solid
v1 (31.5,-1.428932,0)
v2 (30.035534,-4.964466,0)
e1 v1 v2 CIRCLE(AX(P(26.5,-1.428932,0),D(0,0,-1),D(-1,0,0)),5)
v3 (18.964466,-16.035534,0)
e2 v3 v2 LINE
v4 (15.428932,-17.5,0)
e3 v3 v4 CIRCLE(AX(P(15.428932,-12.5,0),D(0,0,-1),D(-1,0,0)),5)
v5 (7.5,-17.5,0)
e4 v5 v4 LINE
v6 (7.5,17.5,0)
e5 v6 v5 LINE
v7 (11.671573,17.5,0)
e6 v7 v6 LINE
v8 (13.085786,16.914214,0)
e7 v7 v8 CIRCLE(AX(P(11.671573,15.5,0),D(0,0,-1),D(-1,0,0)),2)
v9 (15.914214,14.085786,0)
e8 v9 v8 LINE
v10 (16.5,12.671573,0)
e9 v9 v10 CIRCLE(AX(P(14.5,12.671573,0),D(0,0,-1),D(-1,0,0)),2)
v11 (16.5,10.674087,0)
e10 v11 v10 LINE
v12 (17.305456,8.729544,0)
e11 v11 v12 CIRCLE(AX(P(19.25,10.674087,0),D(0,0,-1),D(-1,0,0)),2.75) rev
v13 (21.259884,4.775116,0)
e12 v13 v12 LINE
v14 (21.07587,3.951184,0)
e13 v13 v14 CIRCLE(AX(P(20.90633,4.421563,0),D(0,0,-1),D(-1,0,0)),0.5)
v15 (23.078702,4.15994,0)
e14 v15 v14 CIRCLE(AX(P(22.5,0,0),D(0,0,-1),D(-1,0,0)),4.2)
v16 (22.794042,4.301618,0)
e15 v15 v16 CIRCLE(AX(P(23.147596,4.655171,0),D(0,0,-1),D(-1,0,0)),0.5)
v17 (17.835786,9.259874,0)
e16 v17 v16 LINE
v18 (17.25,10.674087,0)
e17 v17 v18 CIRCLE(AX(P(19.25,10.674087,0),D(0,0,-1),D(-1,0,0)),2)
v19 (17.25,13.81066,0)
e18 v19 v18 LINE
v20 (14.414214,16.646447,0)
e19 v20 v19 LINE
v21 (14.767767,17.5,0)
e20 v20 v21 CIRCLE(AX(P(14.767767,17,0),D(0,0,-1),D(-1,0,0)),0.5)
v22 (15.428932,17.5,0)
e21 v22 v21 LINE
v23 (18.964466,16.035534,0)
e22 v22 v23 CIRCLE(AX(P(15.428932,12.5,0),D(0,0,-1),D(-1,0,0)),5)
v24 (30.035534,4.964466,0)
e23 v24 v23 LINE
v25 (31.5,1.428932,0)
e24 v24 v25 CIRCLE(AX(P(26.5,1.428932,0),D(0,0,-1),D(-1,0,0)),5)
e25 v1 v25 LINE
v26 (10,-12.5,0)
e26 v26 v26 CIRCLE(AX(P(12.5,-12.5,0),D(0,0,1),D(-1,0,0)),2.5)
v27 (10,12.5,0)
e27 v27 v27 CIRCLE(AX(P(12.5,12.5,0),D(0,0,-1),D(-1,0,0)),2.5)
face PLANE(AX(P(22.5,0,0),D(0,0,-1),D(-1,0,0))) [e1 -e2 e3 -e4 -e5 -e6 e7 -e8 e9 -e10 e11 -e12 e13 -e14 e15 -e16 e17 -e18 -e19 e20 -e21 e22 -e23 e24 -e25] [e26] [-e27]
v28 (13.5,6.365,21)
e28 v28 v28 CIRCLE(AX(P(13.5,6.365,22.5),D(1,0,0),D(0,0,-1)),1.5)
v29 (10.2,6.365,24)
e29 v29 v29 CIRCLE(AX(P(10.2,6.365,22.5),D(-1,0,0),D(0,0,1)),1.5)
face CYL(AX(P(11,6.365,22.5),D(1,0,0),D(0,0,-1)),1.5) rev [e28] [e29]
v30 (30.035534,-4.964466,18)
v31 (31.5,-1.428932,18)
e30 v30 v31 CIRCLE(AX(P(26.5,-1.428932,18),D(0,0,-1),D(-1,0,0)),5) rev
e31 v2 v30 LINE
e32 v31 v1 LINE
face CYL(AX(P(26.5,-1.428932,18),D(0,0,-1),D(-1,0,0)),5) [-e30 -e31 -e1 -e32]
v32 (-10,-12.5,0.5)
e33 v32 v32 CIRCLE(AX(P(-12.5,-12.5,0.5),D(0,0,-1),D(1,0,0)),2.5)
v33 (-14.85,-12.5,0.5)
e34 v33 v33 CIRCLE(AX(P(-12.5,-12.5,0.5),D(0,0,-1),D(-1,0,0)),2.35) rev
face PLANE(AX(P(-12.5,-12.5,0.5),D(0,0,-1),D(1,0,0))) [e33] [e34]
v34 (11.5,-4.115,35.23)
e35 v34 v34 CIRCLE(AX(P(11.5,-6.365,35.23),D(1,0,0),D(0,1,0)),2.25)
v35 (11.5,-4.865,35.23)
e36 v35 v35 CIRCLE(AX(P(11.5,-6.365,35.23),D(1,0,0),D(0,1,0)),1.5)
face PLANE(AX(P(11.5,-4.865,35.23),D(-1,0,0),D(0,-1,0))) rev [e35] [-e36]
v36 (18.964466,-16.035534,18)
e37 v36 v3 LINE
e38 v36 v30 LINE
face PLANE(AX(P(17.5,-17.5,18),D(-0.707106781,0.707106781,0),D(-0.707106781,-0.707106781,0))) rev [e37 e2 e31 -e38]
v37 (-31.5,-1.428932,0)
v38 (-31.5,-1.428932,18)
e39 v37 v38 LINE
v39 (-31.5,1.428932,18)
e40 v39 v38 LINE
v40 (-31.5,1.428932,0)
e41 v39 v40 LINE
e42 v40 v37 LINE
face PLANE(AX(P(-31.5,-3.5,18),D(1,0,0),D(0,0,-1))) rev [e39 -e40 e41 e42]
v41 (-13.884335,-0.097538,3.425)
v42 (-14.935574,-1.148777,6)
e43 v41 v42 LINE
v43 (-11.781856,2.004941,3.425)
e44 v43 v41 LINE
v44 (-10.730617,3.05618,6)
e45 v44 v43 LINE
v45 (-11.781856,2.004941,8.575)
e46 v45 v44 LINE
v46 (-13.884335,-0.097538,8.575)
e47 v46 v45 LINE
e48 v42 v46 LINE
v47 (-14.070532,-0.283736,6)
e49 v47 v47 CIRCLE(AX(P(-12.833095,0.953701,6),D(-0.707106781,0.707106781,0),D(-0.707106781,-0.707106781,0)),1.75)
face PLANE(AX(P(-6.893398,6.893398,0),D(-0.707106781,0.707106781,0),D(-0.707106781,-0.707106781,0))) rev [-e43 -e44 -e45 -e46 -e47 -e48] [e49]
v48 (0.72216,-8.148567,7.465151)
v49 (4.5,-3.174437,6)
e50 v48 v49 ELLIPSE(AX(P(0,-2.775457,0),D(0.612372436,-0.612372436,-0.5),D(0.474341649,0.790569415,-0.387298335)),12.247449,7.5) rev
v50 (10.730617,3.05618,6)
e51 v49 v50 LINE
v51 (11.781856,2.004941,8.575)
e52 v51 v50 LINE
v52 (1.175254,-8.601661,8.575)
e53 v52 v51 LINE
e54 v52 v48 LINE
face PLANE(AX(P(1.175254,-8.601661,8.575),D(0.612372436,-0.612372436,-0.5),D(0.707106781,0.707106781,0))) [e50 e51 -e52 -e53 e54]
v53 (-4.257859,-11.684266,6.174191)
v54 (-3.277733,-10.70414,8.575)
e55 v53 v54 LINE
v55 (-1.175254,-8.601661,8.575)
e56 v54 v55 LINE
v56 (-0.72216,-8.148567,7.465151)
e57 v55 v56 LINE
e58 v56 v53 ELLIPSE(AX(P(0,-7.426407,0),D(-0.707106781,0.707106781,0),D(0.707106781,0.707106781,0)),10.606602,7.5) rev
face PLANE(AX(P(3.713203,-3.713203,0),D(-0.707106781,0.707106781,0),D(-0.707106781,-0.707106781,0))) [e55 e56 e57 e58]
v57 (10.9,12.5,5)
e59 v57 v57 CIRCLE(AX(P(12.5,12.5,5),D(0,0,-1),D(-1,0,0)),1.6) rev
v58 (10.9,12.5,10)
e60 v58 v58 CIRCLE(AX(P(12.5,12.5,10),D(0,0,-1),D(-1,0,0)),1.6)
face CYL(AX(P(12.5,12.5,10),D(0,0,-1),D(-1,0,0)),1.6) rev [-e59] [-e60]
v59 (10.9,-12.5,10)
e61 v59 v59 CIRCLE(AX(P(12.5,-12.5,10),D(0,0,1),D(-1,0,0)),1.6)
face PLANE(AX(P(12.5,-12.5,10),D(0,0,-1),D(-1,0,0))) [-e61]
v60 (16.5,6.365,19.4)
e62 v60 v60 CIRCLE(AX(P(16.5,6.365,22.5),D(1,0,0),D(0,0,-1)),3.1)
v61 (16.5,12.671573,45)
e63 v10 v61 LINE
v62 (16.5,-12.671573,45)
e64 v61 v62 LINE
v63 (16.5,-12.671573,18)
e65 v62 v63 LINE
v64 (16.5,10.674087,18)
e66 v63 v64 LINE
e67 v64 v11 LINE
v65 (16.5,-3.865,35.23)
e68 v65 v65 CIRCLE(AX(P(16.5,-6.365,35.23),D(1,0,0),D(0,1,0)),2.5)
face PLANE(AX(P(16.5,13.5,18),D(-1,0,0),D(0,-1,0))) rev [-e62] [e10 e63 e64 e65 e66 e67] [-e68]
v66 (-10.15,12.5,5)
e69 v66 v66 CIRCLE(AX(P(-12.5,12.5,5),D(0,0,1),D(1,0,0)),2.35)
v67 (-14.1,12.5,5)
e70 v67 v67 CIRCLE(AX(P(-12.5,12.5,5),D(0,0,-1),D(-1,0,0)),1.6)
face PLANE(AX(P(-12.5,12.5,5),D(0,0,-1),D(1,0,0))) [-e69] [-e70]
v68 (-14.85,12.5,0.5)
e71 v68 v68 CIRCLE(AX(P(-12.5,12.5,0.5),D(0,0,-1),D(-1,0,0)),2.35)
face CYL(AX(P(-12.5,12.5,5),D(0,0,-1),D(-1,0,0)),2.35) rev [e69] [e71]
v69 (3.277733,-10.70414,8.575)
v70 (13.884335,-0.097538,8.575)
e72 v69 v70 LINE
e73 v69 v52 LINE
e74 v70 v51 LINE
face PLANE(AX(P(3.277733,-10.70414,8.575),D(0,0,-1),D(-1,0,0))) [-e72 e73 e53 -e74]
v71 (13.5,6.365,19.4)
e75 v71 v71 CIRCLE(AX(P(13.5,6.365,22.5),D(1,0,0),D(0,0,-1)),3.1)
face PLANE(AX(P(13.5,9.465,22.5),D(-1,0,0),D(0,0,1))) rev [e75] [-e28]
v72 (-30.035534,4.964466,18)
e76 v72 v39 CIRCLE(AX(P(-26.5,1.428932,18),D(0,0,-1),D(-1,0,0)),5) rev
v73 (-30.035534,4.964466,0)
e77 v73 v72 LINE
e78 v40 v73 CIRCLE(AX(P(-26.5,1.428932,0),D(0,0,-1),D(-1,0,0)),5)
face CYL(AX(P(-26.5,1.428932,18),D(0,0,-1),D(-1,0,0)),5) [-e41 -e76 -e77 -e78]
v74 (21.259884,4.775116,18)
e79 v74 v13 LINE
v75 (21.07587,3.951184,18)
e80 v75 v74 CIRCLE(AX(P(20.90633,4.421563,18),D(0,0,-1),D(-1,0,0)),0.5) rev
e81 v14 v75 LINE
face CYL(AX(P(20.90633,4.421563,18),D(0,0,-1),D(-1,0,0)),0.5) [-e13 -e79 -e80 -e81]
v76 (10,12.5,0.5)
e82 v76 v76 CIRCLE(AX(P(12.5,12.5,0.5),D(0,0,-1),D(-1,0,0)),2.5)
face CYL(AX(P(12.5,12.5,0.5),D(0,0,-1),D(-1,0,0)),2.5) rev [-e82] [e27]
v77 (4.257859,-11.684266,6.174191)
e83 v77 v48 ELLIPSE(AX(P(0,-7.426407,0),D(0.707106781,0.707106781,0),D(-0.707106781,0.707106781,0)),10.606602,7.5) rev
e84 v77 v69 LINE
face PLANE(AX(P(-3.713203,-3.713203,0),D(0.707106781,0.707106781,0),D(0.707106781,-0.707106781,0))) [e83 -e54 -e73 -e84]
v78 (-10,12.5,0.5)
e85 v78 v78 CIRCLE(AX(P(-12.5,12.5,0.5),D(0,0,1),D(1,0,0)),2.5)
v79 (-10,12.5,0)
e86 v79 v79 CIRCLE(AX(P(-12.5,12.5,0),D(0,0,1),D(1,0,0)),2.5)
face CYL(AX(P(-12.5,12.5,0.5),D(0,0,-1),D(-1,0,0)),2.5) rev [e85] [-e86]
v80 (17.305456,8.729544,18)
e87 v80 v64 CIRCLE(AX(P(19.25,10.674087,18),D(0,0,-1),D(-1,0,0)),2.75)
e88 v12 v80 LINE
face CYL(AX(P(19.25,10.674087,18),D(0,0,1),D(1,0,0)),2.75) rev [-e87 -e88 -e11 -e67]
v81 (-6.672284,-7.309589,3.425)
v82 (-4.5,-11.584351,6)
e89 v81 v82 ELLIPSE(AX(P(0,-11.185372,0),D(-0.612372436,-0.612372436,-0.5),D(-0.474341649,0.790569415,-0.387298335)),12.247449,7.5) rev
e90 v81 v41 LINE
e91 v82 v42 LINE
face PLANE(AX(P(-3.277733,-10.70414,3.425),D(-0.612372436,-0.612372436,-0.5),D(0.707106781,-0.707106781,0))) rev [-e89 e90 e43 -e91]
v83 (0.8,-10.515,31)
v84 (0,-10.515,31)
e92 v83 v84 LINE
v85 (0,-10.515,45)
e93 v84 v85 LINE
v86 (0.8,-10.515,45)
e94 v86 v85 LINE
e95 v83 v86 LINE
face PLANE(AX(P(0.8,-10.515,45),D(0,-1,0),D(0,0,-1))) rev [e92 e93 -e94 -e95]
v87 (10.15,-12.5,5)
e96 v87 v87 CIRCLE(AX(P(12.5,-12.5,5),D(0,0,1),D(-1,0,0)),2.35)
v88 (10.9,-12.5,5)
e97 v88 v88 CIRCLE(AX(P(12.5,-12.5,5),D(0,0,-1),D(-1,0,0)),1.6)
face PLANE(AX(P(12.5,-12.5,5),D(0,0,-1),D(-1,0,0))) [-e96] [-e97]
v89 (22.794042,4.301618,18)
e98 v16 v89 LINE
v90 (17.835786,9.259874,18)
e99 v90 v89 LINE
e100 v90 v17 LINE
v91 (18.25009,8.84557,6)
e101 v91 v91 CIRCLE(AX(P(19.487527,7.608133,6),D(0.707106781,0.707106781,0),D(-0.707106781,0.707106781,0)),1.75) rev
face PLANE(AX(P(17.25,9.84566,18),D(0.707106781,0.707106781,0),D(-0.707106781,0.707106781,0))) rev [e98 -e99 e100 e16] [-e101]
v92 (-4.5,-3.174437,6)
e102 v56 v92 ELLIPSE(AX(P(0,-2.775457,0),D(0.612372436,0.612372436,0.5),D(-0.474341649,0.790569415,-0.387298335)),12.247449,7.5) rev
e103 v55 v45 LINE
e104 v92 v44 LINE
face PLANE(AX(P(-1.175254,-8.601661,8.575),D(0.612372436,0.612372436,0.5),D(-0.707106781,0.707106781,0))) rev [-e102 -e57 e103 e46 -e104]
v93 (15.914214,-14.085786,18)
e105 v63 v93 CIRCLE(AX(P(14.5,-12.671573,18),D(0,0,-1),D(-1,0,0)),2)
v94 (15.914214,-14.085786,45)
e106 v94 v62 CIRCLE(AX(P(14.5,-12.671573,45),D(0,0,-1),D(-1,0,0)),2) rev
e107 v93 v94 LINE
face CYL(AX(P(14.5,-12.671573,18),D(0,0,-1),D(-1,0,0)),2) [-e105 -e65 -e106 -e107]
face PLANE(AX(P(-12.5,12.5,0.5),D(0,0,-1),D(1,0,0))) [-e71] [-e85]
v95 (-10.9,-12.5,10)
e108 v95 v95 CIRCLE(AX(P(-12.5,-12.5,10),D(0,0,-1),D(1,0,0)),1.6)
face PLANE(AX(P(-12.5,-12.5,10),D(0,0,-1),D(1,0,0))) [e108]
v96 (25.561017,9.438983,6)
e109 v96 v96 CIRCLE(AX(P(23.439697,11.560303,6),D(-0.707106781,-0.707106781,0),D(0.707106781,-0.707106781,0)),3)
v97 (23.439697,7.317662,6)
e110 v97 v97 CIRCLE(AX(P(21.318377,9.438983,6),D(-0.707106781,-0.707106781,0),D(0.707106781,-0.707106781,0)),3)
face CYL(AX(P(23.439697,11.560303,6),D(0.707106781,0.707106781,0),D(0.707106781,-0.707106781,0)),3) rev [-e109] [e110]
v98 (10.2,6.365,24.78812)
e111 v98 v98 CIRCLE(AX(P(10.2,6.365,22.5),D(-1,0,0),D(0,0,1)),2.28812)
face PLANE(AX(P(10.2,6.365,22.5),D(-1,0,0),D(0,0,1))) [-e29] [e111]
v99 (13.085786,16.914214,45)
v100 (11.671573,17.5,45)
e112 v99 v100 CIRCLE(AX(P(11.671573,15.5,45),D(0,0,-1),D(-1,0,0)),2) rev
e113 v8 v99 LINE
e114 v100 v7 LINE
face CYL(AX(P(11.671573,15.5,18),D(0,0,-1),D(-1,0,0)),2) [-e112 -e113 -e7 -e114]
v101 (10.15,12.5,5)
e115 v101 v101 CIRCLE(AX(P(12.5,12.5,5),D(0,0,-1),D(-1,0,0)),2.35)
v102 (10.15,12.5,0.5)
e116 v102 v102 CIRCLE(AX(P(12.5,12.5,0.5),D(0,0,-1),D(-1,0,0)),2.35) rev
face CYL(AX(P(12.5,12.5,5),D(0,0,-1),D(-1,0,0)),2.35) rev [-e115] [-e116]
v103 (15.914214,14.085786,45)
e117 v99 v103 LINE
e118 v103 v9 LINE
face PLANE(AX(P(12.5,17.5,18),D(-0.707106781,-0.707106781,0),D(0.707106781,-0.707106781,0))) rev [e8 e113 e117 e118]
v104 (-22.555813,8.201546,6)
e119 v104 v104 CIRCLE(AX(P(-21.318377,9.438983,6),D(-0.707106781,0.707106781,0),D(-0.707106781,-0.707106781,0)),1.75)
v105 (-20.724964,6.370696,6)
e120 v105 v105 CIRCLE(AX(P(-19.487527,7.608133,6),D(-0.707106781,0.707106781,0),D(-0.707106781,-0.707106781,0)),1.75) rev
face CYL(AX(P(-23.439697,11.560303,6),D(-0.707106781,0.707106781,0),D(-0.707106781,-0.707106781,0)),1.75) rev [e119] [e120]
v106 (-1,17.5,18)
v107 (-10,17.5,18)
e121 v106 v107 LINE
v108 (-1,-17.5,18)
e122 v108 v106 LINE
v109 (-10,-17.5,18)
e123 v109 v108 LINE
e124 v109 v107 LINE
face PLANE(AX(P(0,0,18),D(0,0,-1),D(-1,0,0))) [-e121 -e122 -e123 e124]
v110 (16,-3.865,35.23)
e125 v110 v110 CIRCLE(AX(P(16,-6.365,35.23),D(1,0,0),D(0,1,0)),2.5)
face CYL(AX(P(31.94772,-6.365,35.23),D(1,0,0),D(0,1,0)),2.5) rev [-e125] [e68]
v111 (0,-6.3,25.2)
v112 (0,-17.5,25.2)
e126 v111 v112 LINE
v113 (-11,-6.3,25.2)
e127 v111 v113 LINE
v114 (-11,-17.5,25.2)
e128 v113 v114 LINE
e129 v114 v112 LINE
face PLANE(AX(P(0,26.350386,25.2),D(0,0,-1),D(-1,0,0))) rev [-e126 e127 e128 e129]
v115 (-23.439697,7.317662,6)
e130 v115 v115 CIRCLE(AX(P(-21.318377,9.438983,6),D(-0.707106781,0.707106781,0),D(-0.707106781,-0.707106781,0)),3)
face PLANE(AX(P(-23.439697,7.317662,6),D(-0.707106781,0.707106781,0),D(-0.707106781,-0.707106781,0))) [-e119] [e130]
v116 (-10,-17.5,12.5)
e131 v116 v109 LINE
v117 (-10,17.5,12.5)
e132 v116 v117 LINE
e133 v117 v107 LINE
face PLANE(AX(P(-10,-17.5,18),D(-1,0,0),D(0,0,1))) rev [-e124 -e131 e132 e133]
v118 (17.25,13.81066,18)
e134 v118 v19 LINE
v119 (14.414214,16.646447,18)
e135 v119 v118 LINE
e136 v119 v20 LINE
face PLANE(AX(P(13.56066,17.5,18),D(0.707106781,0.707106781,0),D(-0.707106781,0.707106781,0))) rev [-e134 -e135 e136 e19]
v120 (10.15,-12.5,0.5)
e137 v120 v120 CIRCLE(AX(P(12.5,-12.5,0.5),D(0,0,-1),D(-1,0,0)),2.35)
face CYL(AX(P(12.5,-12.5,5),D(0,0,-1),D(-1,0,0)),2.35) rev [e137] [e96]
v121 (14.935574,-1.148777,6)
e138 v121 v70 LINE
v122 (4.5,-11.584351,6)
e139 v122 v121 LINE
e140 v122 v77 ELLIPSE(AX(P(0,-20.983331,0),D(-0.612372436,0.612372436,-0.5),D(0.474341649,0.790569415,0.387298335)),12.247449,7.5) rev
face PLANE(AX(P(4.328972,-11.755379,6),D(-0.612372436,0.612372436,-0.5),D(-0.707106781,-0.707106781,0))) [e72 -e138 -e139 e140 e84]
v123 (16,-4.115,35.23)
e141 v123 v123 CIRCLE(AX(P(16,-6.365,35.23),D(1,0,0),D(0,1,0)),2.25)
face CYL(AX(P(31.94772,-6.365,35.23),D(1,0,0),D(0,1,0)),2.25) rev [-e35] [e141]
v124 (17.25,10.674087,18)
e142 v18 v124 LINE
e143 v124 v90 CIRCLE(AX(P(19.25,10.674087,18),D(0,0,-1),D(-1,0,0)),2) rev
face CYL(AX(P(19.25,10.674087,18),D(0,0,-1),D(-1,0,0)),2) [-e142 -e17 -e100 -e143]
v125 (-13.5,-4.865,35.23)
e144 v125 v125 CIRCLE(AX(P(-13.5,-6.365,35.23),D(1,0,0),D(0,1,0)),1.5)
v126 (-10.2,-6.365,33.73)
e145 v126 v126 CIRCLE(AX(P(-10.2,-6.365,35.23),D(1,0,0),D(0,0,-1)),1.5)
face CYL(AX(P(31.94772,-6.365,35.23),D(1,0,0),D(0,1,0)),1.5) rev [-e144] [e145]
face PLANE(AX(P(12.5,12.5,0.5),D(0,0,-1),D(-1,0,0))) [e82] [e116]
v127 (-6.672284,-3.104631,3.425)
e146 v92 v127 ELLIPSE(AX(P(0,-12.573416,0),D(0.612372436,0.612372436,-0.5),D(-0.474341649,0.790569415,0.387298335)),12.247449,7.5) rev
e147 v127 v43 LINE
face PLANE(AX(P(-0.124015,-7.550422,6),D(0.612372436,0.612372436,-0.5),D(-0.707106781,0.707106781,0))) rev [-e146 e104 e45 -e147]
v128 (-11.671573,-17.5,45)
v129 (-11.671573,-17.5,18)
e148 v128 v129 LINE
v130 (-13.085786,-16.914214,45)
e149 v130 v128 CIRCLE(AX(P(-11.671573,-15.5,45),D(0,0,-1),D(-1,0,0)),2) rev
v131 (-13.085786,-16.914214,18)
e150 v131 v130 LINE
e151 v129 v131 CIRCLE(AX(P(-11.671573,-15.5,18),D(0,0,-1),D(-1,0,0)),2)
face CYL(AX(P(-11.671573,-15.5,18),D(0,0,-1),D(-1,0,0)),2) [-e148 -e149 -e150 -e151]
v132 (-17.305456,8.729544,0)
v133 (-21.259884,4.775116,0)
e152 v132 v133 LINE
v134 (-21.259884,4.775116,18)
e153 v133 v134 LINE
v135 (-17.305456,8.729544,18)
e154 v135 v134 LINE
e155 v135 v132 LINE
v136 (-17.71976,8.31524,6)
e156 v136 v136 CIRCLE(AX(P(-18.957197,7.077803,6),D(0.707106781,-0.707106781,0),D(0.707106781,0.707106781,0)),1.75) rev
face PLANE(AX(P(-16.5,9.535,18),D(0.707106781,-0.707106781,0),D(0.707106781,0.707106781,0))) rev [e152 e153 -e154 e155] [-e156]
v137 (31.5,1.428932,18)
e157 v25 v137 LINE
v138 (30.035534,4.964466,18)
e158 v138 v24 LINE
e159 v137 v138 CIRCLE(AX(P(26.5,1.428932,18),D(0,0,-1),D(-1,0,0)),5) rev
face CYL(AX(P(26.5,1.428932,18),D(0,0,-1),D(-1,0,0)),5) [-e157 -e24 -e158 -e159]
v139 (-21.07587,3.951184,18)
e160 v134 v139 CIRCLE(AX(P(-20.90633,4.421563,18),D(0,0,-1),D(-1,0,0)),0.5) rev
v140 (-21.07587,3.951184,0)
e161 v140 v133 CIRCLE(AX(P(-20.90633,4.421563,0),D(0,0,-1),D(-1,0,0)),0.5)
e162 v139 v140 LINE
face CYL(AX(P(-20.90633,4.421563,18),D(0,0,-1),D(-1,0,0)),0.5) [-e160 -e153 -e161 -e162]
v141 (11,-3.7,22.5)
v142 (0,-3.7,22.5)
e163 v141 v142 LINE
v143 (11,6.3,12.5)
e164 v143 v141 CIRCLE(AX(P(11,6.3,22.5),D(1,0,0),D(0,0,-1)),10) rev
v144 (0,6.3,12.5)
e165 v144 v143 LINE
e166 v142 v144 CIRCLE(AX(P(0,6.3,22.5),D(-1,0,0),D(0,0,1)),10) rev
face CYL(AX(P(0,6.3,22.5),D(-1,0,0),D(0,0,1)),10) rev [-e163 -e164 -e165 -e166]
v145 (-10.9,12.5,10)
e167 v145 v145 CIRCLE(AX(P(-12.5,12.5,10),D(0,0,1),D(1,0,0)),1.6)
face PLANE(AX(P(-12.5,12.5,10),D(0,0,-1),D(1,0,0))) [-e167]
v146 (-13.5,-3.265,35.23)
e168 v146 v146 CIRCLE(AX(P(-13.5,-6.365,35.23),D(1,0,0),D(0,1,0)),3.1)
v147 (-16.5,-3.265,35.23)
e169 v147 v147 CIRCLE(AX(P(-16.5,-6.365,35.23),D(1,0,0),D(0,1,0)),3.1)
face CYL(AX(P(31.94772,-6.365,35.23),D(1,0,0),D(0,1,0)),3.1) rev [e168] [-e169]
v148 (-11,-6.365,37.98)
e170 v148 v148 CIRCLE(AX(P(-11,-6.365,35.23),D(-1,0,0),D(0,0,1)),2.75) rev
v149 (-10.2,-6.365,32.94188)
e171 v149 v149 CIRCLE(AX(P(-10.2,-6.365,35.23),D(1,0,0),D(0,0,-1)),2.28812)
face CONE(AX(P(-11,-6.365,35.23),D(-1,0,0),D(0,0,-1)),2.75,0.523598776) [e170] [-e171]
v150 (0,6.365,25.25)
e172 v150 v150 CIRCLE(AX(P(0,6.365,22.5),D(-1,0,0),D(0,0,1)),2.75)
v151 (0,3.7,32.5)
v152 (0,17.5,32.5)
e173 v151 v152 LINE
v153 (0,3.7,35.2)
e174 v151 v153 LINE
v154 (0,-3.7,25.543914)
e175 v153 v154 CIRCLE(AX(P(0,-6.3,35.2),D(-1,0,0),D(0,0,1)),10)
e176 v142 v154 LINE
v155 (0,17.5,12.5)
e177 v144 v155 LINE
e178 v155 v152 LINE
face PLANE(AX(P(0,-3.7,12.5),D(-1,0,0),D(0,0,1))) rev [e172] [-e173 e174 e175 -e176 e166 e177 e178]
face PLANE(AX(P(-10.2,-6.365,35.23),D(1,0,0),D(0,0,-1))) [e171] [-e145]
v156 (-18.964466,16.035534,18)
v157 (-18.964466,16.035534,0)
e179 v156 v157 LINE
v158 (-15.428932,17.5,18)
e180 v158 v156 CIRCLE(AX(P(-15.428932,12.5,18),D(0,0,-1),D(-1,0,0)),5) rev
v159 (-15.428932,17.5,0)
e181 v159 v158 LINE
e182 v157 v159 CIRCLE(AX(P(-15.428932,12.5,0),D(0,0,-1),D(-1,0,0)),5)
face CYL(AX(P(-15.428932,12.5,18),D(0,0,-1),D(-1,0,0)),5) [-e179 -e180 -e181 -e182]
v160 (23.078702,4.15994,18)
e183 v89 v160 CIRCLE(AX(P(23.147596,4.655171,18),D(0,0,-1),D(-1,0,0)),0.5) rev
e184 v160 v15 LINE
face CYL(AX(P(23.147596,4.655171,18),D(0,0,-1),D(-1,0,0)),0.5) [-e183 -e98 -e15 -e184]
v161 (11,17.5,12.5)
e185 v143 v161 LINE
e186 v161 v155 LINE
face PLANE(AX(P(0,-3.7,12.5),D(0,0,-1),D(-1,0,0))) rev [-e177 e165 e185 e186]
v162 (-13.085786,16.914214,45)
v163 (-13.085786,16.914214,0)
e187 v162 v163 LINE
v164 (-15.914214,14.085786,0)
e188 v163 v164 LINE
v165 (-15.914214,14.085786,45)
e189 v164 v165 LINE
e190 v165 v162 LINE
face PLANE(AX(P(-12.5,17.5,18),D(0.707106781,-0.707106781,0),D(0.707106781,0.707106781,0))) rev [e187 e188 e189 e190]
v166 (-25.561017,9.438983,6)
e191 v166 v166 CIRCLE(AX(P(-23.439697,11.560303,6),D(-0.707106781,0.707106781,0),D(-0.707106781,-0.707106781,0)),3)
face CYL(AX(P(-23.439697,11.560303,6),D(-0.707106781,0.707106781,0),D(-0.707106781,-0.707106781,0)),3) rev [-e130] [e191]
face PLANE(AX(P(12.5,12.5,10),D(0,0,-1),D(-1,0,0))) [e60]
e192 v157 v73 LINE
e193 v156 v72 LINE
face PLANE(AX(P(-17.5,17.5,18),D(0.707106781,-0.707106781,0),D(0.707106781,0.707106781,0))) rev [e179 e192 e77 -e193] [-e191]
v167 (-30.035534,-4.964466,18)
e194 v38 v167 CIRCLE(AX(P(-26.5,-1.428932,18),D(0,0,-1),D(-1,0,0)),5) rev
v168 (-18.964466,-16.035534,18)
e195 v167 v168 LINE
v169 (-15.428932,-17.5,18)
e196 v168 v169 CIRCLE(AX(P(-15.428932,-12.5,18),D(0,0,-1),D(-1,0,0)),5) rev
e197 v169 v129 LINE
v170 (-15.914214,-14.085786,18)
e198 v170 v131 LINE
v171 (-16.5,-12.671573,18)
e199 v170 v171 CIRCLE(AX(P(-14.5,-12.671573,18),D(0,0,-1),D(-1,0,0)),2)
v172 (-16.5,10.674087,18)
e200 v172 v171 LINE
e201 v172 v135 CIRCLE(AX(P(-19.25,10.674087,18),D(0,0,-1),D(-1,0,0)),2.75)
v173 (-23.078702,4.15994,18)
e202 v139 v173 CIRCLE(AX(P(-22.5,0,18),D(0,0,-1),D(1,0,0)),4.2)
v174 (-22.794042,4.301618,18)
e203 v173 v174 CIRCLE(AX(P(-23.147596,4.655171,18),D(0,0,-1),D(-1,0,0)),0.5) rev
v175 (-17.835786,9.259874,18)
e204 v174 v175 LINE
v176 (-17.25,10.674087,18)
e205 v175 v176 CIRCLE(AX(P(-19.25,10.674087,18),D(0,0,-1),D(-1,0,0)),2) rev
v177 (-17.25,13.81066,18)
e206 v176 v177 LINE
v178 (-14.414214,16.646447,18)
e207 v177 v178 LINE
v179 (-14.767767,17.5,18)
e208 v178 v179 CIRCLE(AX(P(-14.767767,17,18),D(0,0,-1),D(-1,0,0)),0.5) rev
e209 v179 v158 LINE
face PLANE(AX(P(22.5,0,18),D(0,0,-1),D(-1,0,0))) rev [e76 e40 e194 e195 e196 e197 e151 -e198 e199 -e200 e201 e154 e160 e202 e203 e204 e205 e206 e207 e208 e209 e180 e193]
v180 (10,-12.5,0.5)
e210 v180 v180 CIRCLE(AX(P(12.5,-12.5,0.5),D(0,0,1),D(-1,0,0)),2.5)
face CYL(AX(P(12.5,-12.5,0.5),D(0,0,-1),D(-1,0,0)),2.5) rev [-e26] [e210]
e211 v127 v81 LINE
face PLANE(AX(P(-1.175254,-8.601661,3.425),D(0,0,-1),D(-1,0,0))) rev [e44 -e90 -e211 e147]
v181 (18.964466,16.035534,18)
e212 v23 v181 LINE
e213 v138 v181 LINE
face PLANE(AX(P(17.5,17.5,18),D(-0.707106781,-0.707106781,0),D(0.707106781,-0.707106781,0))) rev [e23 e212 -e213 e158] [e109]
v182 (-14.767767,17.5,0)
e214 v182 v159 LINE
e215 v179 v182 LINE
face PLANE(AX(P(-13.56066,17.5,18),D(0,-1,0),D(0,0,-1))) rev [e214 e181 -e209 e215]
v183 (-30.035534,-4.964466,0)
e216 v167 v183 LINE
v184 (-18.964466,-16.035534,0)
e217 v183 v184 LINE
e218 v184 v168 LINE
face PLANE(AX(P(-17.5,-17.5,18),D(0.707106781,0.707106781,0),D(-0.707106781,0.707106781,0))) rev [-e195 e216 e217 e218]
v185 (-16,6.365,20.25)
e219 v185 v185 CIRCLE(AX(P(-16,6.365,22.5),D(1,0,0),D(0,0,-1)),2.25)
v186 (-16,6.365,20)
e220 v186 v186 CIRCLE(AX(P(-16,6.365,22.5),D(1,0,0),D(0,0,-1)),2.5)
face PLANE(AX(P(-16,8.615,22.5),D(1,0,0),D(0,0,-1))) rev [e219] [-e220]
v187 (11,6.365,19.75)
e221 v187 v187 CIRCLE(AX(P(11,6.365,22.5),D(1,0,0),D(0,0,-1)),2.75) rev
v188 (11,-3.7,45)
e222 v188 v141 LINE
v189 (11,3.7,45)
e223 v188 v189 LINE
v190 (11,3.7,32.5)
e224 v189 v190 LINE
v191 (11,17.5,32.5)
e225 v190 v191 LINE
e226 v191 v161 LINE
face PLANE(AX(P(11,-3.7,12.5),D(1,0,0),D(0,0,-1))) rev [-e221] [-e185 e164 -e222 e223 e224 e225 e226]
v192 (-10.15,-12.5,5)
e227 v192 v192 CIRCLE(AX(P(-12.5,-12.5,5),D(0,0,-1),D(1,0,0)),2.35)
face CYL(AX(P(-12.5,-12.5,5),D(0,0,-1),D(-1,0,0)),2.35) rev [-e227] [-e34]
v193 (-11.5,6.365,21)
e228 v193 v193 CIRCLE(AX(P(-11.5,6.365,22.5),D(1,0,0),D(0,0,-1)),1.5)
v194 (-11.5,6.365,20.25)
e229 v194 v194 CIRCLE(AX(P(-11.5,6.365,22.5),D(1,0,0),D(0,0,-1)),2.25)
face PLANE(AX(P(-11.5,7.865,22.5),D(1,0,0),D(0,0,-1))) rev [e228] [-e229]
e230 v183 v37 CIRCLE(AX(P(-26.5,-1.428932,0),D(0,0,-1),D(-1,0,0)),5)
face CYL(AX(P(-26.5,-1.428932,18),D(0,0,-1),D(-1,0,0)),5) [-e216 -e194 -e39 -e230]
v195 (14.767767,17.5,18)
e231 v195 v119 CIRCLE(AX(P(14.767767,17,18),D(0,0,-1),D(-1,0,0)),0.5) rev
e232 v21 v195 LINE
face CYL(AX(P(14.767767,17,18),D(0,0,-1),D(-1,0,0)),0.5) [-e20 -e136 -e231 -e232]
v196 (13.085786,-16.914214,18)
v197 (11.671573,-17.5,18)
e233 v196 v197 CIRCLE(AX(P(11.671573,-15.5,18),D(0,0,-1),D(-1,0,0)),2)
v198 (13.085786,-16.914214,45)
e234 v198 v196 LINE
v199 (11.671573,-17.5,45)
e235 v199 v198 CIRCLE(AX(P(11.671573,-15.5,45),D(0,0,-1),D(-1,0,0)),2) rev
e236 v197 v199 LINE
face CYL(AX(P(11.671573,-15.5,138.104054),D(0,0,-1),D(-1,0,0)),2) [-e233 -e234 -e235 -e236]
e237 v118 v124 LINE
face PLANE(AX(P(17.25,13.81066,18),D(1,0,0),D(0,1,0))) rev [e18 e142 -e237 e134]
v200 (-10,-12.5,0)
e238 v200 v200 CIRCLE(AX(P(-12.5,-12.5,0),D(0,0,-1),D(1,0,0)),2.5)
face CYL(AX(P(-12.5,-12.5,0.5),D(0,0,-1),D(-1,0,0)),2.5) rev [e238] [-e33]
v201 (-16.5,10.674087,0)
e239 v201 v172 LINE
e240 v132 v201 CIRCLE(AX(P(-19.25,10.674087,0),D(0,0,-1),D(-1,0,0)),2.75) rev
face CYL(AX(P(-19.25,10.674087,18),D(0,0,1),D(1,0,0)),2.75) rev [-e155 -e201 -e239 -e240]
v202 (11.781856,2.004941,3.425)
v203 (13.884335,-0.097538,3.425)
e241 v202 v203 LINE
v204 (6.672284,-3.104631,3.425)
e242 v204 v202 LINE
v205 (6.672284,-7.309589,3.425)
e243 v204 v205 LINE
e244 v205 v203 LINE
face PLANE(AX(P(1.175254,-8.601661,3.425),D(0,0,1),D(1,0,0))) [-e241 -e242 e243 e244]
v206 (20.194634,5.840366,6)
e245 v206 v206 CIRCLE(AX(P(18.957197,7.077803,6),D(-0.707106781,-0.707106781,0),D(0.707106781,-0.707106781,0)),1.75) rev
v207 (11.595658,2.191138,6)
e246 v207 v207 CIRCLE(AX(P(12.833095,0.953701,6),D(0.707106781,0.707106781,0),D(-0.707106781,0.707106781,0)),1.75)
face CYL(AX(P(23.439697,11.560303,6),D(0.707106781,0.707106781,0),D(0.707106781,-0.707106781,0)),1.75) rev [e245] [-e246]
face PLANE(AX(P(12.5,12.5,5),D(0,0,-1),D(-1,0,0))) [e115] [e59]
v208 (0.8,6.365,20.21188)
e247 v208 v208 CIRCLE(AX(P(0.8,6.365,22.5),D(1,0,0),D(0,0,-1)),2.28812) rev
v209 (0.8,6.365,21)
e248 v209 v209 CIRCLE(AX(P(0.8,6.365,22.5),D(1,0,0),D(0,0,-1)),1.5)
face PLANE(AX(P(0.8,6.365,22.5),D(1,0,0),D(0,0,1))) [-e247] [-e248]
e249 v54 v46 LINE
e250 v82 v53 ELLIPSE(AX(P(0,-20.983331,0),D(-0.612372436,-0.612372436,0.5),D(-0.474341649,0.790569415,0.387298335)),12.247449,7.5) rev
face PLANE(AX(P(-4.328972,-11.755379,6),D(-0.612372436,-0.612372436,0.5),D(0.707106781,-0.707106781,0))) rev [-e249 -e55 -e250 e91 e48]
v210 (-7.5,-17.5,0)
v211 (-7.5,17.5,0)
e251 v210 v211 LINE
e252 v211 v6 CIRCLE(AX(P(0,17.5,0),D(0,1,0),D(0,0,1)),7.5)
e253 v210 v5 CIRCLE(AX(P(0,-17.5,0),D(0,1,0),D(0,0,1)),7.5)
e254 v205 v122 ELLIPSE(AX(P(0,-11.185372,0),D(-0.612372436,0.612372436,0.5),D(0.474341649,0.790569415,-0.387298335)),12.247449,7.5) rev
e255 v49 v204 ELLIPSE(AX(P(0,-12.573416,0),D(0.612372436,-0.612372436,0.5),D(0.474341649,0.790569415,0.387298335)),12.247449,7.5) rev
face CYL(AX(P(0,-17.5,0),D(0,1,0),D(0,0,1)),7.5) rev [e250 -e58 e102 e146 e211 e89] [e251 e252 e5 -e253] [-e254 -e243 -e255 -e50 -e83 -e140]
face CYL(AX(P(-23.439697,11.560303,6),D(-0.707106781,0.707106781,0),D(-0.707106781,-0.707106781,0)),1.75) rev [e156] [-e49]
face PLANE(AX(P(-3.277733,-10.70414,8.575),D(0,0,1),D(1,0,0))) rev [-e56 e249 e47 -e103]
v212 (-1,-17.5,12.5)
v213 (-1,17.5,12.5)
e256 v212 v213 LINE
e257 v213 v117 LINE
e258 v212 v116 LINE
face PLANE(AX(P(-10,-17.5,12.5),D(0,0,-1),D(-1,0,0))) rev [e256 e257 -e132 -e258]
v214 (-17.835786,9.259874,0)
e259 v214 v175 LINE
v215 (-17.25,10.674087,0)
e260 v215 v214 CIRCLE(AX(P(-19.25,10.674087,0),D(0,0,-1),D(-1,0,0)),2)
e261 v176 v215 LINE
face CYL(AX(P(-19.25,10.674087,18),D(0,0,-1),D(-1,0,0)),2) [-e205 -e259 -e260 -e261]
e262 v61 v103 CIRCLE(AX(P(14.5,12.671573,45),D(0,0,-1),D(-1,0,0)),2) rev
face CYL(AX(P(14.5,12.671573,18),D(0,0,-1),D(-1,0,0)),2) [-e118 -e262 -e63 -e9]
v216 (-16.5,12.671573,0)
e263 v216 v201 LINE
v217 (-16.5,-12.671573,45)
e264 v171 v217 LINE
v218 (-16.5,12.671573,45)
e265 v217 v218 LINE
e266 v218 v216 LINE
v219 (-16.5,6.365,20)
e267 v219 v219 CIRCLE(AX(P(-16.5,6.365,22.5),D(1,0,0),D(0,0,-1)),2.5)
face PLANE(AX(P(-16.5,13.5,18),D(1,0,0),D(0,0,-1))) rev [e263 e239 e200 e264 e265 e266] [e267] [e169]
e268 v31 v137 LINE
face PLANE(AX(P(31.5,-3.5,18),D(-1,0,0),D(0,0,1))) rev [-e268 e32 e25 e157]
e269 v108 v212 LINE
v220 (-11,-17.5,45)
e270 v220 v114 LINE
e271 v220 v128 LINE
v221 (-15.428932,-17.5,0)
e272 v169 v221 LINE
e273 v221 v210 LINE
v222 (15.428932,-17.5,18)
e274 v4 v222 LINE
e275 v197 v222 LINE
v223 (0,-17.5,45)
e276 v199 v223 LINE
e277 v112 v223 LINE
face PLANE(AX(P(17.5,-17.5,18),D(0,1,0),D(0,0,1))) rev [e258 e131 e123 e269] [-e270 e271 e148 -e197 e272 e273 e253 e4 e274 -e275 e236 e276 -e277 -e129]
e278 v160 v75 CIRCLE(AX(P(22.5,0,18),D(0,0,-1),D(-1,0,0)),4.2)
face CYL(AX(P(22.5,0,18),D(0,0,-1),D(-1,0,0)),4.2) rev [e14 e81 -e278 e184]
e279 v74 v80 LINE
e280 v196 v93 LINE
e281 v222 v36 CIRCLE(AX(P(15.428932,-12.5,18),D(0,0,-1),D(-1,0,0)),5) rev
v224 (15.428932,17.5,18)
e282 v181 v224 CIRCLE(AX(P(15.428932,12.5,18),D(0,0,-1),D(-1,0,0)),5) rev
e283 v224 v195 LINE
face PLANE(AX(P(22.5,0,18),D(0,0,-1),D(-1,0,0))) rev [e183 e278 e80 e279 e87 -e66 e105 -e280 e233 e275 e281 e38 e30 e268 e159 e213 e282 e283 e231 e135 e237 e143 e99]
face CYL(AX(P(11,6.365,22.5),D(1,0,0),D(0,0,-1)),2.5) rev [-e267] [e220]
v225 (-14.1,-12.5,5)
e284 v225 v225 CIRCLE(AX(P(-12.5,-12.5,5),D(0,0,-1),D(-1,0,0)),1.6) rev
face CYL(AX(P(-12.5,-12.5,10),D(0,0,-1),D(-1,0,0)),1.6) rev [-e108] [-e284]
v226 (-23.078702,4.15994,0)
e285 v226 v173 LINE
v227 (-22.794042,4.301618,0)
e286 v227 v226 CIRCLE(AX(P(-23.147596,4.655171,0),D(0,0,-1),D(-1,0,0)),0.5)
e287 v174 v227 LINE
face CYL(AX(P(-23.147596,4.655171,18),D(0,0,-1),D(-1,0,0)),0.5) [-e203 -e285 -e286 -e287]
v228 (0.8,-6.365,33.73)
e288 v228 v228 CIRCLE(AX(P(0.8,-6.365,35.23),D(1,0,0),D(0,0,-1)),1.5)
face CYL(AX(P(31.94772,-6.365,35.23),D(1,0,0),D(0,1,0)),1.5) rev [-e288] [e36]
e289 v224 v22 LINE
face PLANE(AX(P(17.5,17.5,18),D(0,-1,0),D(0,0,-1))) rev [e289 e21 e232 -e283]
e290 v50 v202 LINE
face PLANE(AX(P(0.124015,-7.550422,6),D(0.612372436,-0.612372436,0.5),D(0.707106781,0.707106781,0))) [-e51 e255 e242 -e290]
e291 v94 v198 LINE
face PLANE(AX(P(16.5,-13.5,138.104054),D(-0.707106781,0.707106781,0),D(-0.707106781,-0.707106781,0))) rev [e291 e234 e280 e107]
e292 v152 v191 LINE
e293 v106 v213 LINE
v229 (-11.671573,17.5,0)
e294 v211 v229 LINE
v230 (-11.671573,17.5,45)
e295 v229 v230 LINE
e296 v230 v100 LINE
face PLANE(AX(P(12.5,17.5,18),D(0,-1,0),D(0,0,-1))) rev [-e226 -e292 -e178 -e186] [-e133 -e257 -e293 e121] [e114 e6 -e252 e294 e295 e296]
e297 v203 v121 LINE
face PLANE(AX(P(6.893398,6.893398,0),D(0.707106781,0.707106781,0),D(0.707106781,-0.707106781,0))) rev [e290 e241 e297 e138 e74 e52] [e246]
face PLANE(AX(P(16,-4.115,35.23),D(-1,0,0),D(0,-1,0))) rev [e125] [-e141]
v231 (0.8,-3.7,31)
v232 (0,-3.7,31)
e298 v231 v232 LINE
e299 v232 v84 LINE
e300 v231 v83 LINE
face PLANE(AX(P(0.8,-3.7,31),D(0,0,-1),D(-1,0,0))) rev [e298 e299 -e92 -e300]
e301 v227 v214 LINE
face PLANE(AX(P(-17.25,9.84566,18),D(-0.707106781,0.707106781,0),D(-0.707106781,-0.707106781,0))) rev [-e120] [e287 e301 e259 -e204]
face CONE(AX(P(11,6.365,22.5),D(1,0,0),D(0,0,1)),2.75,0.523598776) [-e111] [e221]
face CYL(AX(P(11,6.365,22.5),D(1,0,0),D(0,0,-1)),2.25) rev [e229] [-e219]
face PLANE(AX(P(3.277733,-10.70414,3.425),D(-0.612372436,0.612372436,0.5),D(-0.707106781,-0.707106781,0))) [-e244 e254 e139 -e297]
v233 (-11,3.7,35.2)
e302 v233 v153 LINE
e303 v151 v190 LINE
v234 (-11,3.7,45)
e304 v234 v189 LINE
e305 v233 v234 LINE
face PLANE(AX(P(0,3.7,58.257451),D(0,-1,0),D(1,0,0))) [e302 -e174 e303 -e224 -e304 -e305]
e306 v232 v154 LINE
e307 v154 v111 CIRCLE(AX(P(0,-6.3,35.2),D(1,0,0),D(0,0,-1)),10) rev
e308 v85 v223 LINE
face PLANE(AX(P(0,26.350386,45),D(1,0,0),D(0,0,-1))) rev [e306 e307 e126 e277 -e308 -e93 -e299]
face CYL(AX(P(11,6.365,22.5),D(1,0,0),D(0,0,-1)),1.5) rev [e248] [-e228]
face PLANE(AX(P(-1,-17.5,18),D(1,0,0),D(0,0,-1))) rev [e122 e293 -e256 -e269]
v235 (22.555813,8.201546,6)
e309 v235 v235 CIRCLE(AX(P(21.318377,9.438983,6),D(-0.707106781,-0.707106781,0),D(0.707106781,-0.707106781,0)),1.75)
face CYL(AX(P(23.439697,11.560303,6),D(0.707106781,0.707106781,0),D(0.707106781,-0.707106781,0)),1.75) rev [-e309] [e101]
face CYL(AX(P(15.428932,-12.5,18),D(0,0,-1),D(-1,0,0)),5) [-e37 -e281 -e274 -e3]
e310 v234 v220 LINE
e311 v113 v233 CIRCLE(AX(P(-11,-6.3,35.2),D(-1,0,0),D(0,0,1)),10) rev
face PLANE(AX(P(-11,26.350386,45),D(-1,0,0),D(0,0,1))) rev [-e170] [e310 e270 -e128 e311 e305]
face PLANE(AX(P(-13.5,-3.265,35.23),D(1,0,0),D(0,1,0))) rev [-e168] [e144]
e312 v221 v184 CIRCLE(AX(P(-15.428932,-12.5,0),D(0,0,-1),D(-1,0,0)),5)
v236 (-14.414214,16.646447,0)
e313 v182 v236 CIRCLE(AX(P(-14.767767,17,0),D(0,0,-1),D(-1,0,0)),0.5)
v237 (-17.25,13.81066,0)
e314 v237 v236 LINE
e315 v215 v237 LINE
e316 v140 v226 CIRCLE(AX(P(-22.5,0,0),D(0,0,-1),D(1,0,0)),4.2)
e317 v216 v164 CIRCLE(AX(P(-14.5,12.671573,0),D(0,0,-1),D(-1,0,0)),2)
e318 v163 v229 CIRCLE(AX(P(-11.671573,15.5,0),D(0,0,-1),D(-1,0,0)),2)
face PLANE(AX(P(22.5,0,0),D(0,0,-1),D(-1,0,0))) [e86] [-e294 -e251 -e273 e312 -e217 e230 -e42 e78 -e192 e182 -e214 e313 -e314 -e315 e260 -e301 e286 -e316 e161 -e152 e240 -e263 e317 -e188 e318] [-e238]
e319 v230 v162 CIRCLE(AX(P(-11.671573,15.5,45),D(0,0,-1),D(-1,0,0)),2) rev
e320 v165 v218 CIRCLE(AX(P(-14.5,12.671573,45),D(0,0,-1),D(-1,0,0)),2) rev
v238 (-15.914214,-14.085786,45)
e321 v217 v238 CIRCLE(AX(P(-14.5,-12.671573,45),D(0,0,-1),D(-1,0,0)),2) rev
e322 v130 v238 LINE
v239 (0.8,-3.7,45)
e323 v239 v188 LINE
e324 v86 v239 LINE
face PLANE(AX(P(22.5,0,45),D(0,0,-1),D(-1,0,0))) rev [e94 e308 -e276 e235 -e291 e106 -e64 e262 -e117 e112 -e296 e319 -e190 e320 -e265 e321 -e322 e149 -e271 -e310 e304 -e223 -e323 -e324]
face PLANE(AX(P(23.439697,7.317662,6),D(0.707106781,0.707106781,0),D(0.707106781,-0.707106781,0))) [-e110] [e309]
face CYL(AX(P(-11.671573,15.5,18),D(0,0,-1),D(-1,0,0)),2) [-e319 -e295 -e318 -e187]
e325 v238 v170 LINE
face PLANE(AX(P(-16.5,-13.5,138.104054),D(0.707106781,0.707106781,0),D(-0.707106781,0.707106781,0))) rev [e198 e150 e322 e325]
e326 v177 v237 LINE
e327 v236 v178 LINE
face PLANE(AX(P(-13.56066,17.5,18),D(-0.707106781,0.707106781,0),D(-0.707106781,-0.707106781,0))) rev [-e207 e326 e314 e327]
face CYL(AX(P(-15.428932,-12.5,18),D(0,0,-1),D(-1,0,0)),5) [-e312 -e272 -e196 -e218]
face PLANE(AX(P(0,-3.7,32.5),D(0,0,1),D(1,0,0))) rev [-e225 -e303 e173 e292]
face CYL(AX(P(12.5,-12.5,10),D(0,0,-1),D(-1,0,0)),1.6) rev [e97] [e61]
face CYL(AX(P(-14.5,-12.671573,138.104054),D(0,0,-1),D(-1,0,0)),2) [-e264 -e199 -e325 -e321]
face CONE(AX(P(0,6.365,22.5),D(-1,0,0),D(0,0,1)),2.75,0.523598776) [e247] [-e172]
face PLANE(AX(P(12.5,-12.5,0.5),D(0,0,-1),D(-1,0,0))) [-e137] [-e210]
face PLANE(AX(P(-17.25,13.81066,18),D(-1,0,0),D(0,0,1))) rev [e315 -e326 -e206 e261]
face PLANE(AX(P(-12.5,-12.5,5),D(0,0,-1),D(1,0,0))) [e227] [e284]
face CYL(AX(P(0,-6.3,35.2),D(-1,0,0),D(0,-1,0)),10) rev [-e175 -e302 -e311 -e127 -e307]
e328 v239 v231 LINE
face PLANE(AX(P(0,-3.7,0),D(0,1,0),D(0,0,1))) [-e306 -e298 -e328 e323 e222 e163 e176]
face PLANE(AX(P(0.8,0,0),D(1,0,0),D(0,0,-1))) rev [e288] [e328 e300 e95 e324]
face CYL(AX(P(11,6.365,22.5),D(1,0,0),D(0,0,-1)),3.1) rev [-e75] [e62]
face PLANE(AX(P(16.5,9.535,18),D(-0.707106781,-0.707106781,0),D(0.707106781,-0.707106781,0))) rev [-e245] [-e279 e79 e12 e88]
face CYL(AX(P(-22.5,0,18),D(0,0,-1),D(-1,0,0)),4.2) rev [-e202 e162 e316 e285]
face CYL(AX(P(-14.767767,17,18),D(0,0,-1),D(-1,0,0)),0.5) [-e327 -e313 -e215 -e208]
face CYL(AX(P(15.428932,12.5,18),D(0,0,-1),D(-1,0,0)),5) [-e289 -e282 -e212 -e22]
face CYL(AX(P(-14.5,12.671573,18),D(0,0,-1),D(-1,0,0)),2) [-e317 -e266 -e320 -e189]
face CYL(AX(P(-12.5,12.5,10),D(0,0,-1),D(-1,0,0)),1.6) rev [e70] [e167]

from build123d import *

# Parameters (mm, degrees)
BOSS_EXTRUDE1_DEPTH     = 18
SKETCH2_R               = 7.5
SKETCH2_W               = 9
SKETCH2_H               = 5.5
CUT_EXTRUDE1_DEPTH      = 51.410812332
FILLET1_R               = 5
FILLET2_R               = 0.5
FILLET3_R               = 2
FILLET4_R               = 2.75
CUT_EXTRUDE2_DEPTH      = 15
SKETCH7_R               = 1.6
CUT_EXTRUDE3_DEPTH      = 10
SKETCH8_R               = 2.35
CUT_EXTRUDE4_DEPTH      = 5
SKETCH9_R               = 2.5
CUT_EXTRUDE5_DEPTH      = 0.5
MIRROR3_COPY_1_SKETCH_R = 1.6
MIRROR3_COPY_1_DEPTH    = 10
MIRROR3_COPY_2_SKETCH_R = 2.35
MIRROR3_COPY_2_DEPTH    = 5
MIRROR3_COPY_3_SKETCH_R = 2.5
MIRROR3_COPY_3_DEPTH    = 0.5
BOSS_EXTRUDE2_DEPTH     = 27
SKETCH11_W              = 11
SKETCH11_H              = 20
CUT_EXTRUDE6_DEPTH      = 21.2
SKETCH12_W              = 11
SKETCH12_H              = 3.7
CUT_EXTRUDE7_DEPTH      = 12.5
FILLET5_R               = 10
CUT_EXTRUDE8_REACH      = 67.133
SKETCH13_W              = 11
SKETCH13_H              = 19.8
FILLET6_R               = 10
SKETCH14_W              = 11
SKETCH14_H              = 7.4
CUT_EXTRUDE9_DEPTH      = 12.5
SKETCH15_R              = 2.75
BOSS_EXTRUDE3_DEPTH     = 0.8
BOSS_EXTRUDE3_TAPER     = 30
SKETCH16_W              = 14
SKETCH16_H              = 6.815
CUT_EXTRUDE10_DEPTH     = 0.8
SKETCH19_R              = 2.75
BOSS_EXTRUDE4_DEPTH     = 0.8
BOSS_EXTRUDE4_TAPER     = 30
FILLET7_R               = 2


with BuildPart() as part:
    # Sketch1 → Boss-Extrude1 (new body)
    with BuildSketch(Plane.XY):
        with BuildLine():
            Line((-17.5, 17.5), (-31.5, 3.5))
            Line((-31.5, 3.5), (-31.5, -3.5))
            Line((-31.5, -3.5), (-17.5, -17.5))
            Line((-17.5, -17.5), (17.5, -17.5))
            Line((17.5, -17.5), (31.5, -3.5))
            Line((31.5, -3.5), (31.5, 3.5))
            Line((31.5, 3.5), (17.5, 17.5))
            Line((17.5, 17.5), (13.560660172, 17.5))
            Line((13.560660172, 17.5), (17.25, 13.810660172))
            Line((17.25, 13.810660172), (17.25, 9.845660172))
            Line((17.25, 9.845660172), (22.916347453, 4.179312718))
            ThreePointArc((22.916347453, 4.179312718), (22.602164744, -4.198757241), (21.880882362, 4.154117638))
            Line((21.880882362, 4.154117638), (16.5, 9.535))
            Line((16.5, 9.535), (16.5, 13.5))
            Line((16.5, 13.5), (12.5, 17.5))
            Line((12.5, 17.5), (-12.5, 17.5))
            Line((-12.5, 17.5), (-16.5, 13.5))
            Line((-16.5, 13.5), (-16.5, 9.535))
            Line((-16.5, 9.535), (-21.880882362, 4.154117638))
            ThreePointArc((-21.880882362, 4.154117638), (-22.602164744, -4.198757241), (-22.916347453, 4.179312718))
            Line((-22.916347453, 4.179312718), (-17.25, 9.845660172))
            Line((-17.25, 9.845660172), (-17.25, 13.810660172))
            Line((-17.25, 13.810660172), (-13.560660172, 17.5))
            Line((-13.560660172, 17.5), (-17.5, 17.5))
        make_face()
    extrude(amount=BOSS_EXTRUDE1_DEPTH)

    # Sketch2 → Cut-Extrude1 (cut, through all)
    with BuildSketch(Plane(origin=(0, 17.5, 0), x_dir=(1, 0, 0), z_dir=(0, 1, 0))):
        Circle(SKETCH2_R)
        with Locations((-5.5, -15.25)):
            Rectangle(SKETCH2_W, SKETCH2_H)
    extrude(amount=-CUT_EXTRUDE1_DEPTH, mode=Mode.SUBTRACT)

    # Fillet1
    fillet1_edges = [part.edges().sort_by_distance(p)[0] for p in [
        (17.5, 17.5, 9),
        (31.5, 3.5, 9),
        (31.5, -3.5, 9),
        (17.5, -17.5, 9),
        (-17.5, -17.5, 9),
        (-31.5, -3.5, 9),
        (-31.5, 3.5, 9),
        (-17.5, 17.5, 9),
    ]]
    fillet(fillet1_edges, radius=FILLET1_R)

    # Fillet2
    fillet2_edges = [part.edges().sort_by_distance(p)[0] for p in [
        (-13.560660172, 17.5, 9),
        (-22.916347453, 4.179312718, 9),
        (-21.880882362, 4.154117638, 9),
        (21.880882362, 4.154117638, 9),
        (22.916347453, 4.179312718, 9),
        (13.560660172, 17.5, 9),
    ]]
    fillet(fillet2_edges, radius=FILLET2_R)

    # Fillet3
    fillet3_edges = [part.edges().sort_by_distance(p)[0] for p in [
        (-17.25, 9.845660172, 9),
        (17.25, 9.845660172, 9),
    ]]
    fillet(fillet3_edges, radius=FILLET3_R)

    # Fillet4
    fillet4_edges = [part.edges().sort_by_distance(p)[0] for p in [
        (-16.5, 9.535, 9),
        (16.5, 9.535, 9),
    ]]
    fillet(fillet4_edges, radius=FILLET4_R)

    # Sketch4 → Cut-Revolve1 (revolve, cut)
    with BuildSketch(Plane(origin=(0, 0, 6), x_dir=(-1, 0, 0), z_dir=(0, 0, -1))):
        Polygon((23.439696962, 11.560303038), (25.561017306, 9.438982694), (23.439696962, 7.317662351), (22.555813485, 8.201545827), (14.070532111, -0.283735547), (12.833095244, 0.95370132), align=None)
    cut_revolve1 = revolve(axis=Axis((-23.439696962, 11.560303038, 6), (0.7071067811865471, -0.707106781186548, 0)), mode=Mode.SUBTRACT)

    # Sketch6 → Cut-Extrude2 (cut)
    with BuildSketch(Plane(origin=(-6.893398282, 6.893398282, 0), x_dir=(0, 0, 1), z_dir=(-0.7071067811865471, 0.707106781186548, 0))):
        Polygon((3.425, -9.886676943), (6, -11.373353886), (8.575, -9.886676943), (8.575, -6.913323057), (6, -5.426646114), (3.425, -6.913323057), align=None)
    cut_extrude2 = extrude(amount=-CUT_EXTRUDE2_DEPTH, mode=Mode.SUBTRACT)

    # Mirror1: Cut-Revolve1, Cut-Extrude2 across plane
    add(cut_revolve1.mirror(Plane(origin=(0, 0, 0), x_dir=(0, 0, 1), z_dir=(1, 0, 0))), mode=Mode.SUBTRACT)
    add(cut_extrude2.mirror(Plane(origin=(0, 0, 0), x_dir=(0, 0, 1), z_dir=(1, 0, 0))), mode=Mode.SUBTRACT)

    # Sketch7 → Cut-Extrude3 (cut)
    with BuildSketch(Plane(origin=(0, 0, 0), x_dir=(-1, 0, 0), z_dir=(0, 0, -1))):
        with Locations((-12.5, 12.5)):
            Circle(SKETCH7_R)
    cut_extrude3 = extrude(amount=-CUT_EXTRUDE3_DEPTH, mode=Mode.SUBTRACT)

    # Sketch8 → Cut-Extrude4 (cut)
    with BuildSketch(Plane(origin=(0, 0, 0), x_dir=(-1, 0, 0), z_dir=(0, 0, -1))):
        with Locations((-12.5, 12.5)):
            Circle(SKETCH8_R)
    cut_extrude4 = extrude(amount=-CUT_EXTRUDE4_DEPTH, mode=Mode.SUBTRACT)

    # Sketch9 → Cut-Extrude5 (cut)
    with BuildSketch(Plane(origin=(0, 0, 0), x_dir=(-1, 0, 0), z_dir=(0, 0, -1))):
        with Locations((-12.5, 12.5)):
            Circle(SKETCH9_R)
    cut_extrude5 = extrude(amount=-CUT_EXTRUDE5_DEPTH, mode=Mode.SUBTRACT)

    # Mirror2: Cut-Extrude3, Cut-Extrude4, Cut-Extrude5 across plane
    add(cut_extrude3.mirror(Plane.ZX), mode=Mode.SUBTRACT)
    add(cut_extrude4.mirror(Plane.ZX), mode=Mode.SUBTRACT)
    add(cut_extrude5.mirror(Plane.ZX), mode=Mode.SUBTRACT)

    # Mirror3: Cut-Extrude3, Cut-Extrude4, Cut-Extrude5 across plane
    add(cut_extrude3.mirror(Plane(origin=(0, 0, 0), x_dir=(0, 0, 1), z_dir=(1, 0, 0))), mode=Mode.SUBTRACT)
    add(cut_extrude4.mirror(Plane(origin=(0, 0, 0), x_dir=(0, 0, 1), z_dir=(1, 0, 0))), mode=Mode.SUBTRACT)
    add(cut_extrude5.mirror(Plane(origin=(0, 0, 0), x_dir=(0, 0, 1), z_dir=(1, 0, 0))), mode=Mode.SUBTRACT)

    # Mirror3 copy 1 sketch → Mirror3 copy 1 (cut)
    with BuildSketch(Plane(origin=(0, 0, 0), x_dir=(1, 0, 0), z_dir=(0, 0, -1))):
        with Locations((-12.5, 12.5)):
            Circle(MIRROR3_COPY_1_SKETCH_R)
    extrude(amount=-MIRROR3_COPY_1_DEPTH, mode=Mode.SUBTRACT)

    # Mirror3 copy 2 sketch → Mirror3 copy 2 (cut)
    with BuildSketch(Plane(origin=(0, 0, 0), x_dir=(1, 0, 0), z_dir=(0, 0, -1))):
        with Locations((-12.5, 12.5)):
            Circle(MIRROR3_COPY_2_SKETCH_R)
    extrude(amount=-MIRROR3_COPY_2_DEPTH, mode=Mode.SUBTRACT)

    # Mirror3 copy 3 sketch → Mirror3 copy 3 (cut)
    with BuildSketch(Plane(origin=(0, 0, 0), x_dir=(1, 0, 0), z_dir=(0, 0, -1))):
        with Locations((-12.5, 12.5)):
            Circle(MIRROR3_COPY_3_SKETCH_R)
    extrude(amount=-MIRROR3_COPY_3_DEPTH, mode=Mode.SUBTRACT)

    # Sketch10 → Boss-Extrude2 (add)
    with BuildSketch(Plane.XY.offset(18)):
        Polygon((12.5, 17.5), (-12.5, 17.5), (-16.5, 13.5), (-16.5, -13.5), (-12.5, -17.5), (12.5, -17.5), (16.5, -13.5), (16.5, 13.5), align=None)
    extrude(amount=BOSS_EXTRUDE2_DEPTH)

    # Sketch11 → Cut-Extrude6 (cut)
    with BuildSketch(Plane(origin=(0, 17.5, 0), x_dir=(1, 0, 0), z_dir=(0, 1, 0))):
        with Locations((5.5, -22.5)):
            Rectangle(SKETCH11_W, SKETCH11_H)
    extrude(amount=-CUT_EXTRUDE6_DEPTH, mode=Mode.SUBTRACT)

    # Sketch12 → Cut-Extrude7 (cut)
    with BuildSketch(Plane(origin=(0, 0, 32.5), x_dir=(-1, 0, 0), z_dir=(0, 0, -1))):
        with Locations((-5.5, 1.85)):
            Rectangle(SKETCH12_W, SKETCH12_H)
        Polygon((-11, -3.7), (0, -3.7), (0, -3.591245546), (0, 0), (-11, 0), align=None)
    extrude(amount=-CUT_EXTRUDE7_DEPTH, mode=Mode.SUBTRACT)

    # Fillet5
    fillet5_edges = [part.edges().sort_by_distance(p)[0] for p in [
        (5.5, -3.7, 12.5),
    ]]
    fillet(fillet5_edges, radius=FILLET5_R)

    # Cut-Extrude8: up to this face of the body (flat: up to its plane)
    cut_extrude8_end = Plane(part.part.faces().sort_by_distance((5.5, 3.7, 38.75))[0])
    # Sketch13 → Cut-Extrude8 (cut, up to the picked face)
    with BuildSketch(Plane.XZ.offset(17.5), mode=Mode.PRIVATE) as cut_extrude8_sk1:
        with Locations((-5.5, 35.1)):
            Rectangle(SKETCH13_W, SKETCH13_H)
    cut_extrude8_tool1 = split(extrude(cut_extrude8_sk1.sketch, amount=-CUT_EXTRUDE8_REACH, mode=Mode.PRIVATE), bisect_by=cut_extrude8_end, keep=Keep.BOTH, mode=Mode.PRIVATE)
    add(cut_extrude8_tool1.solids().sort_by(Axis((-5.5, -17.5, 35.1), (0, 1, 0)))[0], mode=Mode.SUBTRACT)

    # Fillet6
    # the kernel refuses this fillet: 10 mm, written as the material it adds along each edge
    with BuildSketch(Plane(origin=(25, 3.7, 25.2), x_dir=(0, 0, 1), z_dir=(-1, 0, 0))) as fillet6_piece_1_section:
        with BuildLine():
            CenterArc((FILLET6_R, -FILLET6_R), FILLET6_R, 90, 90)
            Line((0, -FILLET6_R), (0, 0))
            Line((0, 0), (FILLET6_R, 0))
        make_face()
    fillet6_piece_1 = extrude(amount=36, mode=Mode.PRIVATE)
    fillet6_piece_1 = split(fillet6_piece_1, bisect_by=Plane(origin=(5.5, 3.588944861, 32.5), z_dir=(0, 0, 1)), keep=Keep.TOP, mode=Mode.PRIVATE)
    fillet6_piece_1 = split(fillet6_piece_1, bisect_by=Plane(origin=(11, 3.588944861, 33.172467691), z_dir=(-1, 0, 0)), keep=Keep.TOP, mode=Mode.PRIVATE)
    add(fillet6_piece_1)
    with BuildSketch(Plane(origin=(0, 3.7, 25.2), x_dir=(0, 0, 1), z_dir=(-1, 0, 0))) as fillet6_piece_2:
        with BuildLine():
            CenterArc((FILLET6_R, -FILLET6_R), FILLET6_R, 90, 90)
            Line((0, -FILLET6_R), (0, 0))
            Line((0, 0), (FILLET6_R, 0))
        make_face()
    extrude(amount=11)

    # Sketch14 → Cut-Extrude9 (cut)
    with BuildSketch(Plane.XY.offset(45)):
        with Locations((5.5, 0)):
            Rectangle(SKETCH14_W, SKETCH14_H)
    extrude(amount=-CUT_EXTRUDE9_DEPTH, mode=Mode.SUBTRACT)

    # Sketch15 → Boss-Extrude3 (add)
    with BuildSketch(Plane(origin=(-11, 0, 0), x_dir=(0, 0, -1), z_dir=(1, 0, 0))):
        with Locations((-35.23, -6.365)):
            Circle(SKETCH15_R)
    extrude(amount=BOSS_EXTRUDE3_DEPTH, taper=BOSS_EXTRUDE3_TAPER)

    # Sketch16 → Cut-Extrude10 (cut)
    with BuildSketch(Plane.ZY):
        with Locations((38, -7.1075)):
            Rectangle(SKETCH16_W, SKETCH16_H)
    extrude(amount=-CUT_EXTRUDE10_DEPTH, mode=Mode.SUBTRACT)

    # Sketch17 → Cut-Revolve2 (revolve, cut)
    with BuildSketch(Plane.XY.offset(35.23)):
        Polygon((-16.5, -6.365), (-16.5, -3.265), (-13.5, -3.265), (-13.5, -4.865), (11.5, -4.865), (11.5, -4.115), (16, -4.115), (16, -3.865), (16.5, -3.865), (16.5, -6.365), align=None)
    revolve(axis=Axis((31.947720378, -6.365, 35.23), (-1, 0, 0)), mode=Mode.SUBTRACT)

    # Sketch19 → Boss-Extrude4 (add)
    with BuildSketch(Plane.ZY.offset(-11)):
        with Locations((22.5, 6.365)):
            Circle(SKETCH19_R)
    boss_extrude4 = extrude(amount=BOSS_EXTRUDE4_DEPTH, taper=BOSS_EXTRUDE4_TAPER)

    # Mirror4: Boss-Extrude4 across plane
    add(boss_extrude4.mirror(Plane(origin=(5.5, 0, 0), x_dir=(0, 0, 1), z_dir=(1, 0, 0))))

    # Sketch20 → Cut-Revolve3 (revolve, cut)
    with BuildSketch(Plane.XY.offset(22.5), mode=Mode.PRIVATE) as cut_revolve3_sk:
        Polygon((16.5, 6.365), (16.5, 9.465), (13.5, 9.465), (13.5, 7.865), (-11.5, 7.865), (-11.5, 8.615), (-16, 8.615), (-16, 8.865), (-16.5, 8.865), (-16.5, 6.365), align=None)
    revolve(cut_revolve3_sk.sketch.rotate(Axis((11, 6.365, 22.5), (-1, 0, 0)), 90), axis=Axis((11, 6.365, 22.5), (-1, 0, 0)), mode=Mode.SUBTRACT)

    # Fillet7
    fillet7_edges = [part.edges().sort_by_distance(p)[0] for p in [
        (16.5, -13.5, 31.5),
        (12.5, -17.5, 31.5),
        (-12.5, -17.5, 31.5),
        (-16.5, -13.5, 31.5),
        (-16.5, 13.5, 22.5),
        (-12.5, 17.5, 22.5),
        (12.5, 17.5, 22.5),
        (16.5, 13.5, 22.5),
    ]]
    fillet(fillet7_edges, radius=FILLET7_R)


solid = part.part
